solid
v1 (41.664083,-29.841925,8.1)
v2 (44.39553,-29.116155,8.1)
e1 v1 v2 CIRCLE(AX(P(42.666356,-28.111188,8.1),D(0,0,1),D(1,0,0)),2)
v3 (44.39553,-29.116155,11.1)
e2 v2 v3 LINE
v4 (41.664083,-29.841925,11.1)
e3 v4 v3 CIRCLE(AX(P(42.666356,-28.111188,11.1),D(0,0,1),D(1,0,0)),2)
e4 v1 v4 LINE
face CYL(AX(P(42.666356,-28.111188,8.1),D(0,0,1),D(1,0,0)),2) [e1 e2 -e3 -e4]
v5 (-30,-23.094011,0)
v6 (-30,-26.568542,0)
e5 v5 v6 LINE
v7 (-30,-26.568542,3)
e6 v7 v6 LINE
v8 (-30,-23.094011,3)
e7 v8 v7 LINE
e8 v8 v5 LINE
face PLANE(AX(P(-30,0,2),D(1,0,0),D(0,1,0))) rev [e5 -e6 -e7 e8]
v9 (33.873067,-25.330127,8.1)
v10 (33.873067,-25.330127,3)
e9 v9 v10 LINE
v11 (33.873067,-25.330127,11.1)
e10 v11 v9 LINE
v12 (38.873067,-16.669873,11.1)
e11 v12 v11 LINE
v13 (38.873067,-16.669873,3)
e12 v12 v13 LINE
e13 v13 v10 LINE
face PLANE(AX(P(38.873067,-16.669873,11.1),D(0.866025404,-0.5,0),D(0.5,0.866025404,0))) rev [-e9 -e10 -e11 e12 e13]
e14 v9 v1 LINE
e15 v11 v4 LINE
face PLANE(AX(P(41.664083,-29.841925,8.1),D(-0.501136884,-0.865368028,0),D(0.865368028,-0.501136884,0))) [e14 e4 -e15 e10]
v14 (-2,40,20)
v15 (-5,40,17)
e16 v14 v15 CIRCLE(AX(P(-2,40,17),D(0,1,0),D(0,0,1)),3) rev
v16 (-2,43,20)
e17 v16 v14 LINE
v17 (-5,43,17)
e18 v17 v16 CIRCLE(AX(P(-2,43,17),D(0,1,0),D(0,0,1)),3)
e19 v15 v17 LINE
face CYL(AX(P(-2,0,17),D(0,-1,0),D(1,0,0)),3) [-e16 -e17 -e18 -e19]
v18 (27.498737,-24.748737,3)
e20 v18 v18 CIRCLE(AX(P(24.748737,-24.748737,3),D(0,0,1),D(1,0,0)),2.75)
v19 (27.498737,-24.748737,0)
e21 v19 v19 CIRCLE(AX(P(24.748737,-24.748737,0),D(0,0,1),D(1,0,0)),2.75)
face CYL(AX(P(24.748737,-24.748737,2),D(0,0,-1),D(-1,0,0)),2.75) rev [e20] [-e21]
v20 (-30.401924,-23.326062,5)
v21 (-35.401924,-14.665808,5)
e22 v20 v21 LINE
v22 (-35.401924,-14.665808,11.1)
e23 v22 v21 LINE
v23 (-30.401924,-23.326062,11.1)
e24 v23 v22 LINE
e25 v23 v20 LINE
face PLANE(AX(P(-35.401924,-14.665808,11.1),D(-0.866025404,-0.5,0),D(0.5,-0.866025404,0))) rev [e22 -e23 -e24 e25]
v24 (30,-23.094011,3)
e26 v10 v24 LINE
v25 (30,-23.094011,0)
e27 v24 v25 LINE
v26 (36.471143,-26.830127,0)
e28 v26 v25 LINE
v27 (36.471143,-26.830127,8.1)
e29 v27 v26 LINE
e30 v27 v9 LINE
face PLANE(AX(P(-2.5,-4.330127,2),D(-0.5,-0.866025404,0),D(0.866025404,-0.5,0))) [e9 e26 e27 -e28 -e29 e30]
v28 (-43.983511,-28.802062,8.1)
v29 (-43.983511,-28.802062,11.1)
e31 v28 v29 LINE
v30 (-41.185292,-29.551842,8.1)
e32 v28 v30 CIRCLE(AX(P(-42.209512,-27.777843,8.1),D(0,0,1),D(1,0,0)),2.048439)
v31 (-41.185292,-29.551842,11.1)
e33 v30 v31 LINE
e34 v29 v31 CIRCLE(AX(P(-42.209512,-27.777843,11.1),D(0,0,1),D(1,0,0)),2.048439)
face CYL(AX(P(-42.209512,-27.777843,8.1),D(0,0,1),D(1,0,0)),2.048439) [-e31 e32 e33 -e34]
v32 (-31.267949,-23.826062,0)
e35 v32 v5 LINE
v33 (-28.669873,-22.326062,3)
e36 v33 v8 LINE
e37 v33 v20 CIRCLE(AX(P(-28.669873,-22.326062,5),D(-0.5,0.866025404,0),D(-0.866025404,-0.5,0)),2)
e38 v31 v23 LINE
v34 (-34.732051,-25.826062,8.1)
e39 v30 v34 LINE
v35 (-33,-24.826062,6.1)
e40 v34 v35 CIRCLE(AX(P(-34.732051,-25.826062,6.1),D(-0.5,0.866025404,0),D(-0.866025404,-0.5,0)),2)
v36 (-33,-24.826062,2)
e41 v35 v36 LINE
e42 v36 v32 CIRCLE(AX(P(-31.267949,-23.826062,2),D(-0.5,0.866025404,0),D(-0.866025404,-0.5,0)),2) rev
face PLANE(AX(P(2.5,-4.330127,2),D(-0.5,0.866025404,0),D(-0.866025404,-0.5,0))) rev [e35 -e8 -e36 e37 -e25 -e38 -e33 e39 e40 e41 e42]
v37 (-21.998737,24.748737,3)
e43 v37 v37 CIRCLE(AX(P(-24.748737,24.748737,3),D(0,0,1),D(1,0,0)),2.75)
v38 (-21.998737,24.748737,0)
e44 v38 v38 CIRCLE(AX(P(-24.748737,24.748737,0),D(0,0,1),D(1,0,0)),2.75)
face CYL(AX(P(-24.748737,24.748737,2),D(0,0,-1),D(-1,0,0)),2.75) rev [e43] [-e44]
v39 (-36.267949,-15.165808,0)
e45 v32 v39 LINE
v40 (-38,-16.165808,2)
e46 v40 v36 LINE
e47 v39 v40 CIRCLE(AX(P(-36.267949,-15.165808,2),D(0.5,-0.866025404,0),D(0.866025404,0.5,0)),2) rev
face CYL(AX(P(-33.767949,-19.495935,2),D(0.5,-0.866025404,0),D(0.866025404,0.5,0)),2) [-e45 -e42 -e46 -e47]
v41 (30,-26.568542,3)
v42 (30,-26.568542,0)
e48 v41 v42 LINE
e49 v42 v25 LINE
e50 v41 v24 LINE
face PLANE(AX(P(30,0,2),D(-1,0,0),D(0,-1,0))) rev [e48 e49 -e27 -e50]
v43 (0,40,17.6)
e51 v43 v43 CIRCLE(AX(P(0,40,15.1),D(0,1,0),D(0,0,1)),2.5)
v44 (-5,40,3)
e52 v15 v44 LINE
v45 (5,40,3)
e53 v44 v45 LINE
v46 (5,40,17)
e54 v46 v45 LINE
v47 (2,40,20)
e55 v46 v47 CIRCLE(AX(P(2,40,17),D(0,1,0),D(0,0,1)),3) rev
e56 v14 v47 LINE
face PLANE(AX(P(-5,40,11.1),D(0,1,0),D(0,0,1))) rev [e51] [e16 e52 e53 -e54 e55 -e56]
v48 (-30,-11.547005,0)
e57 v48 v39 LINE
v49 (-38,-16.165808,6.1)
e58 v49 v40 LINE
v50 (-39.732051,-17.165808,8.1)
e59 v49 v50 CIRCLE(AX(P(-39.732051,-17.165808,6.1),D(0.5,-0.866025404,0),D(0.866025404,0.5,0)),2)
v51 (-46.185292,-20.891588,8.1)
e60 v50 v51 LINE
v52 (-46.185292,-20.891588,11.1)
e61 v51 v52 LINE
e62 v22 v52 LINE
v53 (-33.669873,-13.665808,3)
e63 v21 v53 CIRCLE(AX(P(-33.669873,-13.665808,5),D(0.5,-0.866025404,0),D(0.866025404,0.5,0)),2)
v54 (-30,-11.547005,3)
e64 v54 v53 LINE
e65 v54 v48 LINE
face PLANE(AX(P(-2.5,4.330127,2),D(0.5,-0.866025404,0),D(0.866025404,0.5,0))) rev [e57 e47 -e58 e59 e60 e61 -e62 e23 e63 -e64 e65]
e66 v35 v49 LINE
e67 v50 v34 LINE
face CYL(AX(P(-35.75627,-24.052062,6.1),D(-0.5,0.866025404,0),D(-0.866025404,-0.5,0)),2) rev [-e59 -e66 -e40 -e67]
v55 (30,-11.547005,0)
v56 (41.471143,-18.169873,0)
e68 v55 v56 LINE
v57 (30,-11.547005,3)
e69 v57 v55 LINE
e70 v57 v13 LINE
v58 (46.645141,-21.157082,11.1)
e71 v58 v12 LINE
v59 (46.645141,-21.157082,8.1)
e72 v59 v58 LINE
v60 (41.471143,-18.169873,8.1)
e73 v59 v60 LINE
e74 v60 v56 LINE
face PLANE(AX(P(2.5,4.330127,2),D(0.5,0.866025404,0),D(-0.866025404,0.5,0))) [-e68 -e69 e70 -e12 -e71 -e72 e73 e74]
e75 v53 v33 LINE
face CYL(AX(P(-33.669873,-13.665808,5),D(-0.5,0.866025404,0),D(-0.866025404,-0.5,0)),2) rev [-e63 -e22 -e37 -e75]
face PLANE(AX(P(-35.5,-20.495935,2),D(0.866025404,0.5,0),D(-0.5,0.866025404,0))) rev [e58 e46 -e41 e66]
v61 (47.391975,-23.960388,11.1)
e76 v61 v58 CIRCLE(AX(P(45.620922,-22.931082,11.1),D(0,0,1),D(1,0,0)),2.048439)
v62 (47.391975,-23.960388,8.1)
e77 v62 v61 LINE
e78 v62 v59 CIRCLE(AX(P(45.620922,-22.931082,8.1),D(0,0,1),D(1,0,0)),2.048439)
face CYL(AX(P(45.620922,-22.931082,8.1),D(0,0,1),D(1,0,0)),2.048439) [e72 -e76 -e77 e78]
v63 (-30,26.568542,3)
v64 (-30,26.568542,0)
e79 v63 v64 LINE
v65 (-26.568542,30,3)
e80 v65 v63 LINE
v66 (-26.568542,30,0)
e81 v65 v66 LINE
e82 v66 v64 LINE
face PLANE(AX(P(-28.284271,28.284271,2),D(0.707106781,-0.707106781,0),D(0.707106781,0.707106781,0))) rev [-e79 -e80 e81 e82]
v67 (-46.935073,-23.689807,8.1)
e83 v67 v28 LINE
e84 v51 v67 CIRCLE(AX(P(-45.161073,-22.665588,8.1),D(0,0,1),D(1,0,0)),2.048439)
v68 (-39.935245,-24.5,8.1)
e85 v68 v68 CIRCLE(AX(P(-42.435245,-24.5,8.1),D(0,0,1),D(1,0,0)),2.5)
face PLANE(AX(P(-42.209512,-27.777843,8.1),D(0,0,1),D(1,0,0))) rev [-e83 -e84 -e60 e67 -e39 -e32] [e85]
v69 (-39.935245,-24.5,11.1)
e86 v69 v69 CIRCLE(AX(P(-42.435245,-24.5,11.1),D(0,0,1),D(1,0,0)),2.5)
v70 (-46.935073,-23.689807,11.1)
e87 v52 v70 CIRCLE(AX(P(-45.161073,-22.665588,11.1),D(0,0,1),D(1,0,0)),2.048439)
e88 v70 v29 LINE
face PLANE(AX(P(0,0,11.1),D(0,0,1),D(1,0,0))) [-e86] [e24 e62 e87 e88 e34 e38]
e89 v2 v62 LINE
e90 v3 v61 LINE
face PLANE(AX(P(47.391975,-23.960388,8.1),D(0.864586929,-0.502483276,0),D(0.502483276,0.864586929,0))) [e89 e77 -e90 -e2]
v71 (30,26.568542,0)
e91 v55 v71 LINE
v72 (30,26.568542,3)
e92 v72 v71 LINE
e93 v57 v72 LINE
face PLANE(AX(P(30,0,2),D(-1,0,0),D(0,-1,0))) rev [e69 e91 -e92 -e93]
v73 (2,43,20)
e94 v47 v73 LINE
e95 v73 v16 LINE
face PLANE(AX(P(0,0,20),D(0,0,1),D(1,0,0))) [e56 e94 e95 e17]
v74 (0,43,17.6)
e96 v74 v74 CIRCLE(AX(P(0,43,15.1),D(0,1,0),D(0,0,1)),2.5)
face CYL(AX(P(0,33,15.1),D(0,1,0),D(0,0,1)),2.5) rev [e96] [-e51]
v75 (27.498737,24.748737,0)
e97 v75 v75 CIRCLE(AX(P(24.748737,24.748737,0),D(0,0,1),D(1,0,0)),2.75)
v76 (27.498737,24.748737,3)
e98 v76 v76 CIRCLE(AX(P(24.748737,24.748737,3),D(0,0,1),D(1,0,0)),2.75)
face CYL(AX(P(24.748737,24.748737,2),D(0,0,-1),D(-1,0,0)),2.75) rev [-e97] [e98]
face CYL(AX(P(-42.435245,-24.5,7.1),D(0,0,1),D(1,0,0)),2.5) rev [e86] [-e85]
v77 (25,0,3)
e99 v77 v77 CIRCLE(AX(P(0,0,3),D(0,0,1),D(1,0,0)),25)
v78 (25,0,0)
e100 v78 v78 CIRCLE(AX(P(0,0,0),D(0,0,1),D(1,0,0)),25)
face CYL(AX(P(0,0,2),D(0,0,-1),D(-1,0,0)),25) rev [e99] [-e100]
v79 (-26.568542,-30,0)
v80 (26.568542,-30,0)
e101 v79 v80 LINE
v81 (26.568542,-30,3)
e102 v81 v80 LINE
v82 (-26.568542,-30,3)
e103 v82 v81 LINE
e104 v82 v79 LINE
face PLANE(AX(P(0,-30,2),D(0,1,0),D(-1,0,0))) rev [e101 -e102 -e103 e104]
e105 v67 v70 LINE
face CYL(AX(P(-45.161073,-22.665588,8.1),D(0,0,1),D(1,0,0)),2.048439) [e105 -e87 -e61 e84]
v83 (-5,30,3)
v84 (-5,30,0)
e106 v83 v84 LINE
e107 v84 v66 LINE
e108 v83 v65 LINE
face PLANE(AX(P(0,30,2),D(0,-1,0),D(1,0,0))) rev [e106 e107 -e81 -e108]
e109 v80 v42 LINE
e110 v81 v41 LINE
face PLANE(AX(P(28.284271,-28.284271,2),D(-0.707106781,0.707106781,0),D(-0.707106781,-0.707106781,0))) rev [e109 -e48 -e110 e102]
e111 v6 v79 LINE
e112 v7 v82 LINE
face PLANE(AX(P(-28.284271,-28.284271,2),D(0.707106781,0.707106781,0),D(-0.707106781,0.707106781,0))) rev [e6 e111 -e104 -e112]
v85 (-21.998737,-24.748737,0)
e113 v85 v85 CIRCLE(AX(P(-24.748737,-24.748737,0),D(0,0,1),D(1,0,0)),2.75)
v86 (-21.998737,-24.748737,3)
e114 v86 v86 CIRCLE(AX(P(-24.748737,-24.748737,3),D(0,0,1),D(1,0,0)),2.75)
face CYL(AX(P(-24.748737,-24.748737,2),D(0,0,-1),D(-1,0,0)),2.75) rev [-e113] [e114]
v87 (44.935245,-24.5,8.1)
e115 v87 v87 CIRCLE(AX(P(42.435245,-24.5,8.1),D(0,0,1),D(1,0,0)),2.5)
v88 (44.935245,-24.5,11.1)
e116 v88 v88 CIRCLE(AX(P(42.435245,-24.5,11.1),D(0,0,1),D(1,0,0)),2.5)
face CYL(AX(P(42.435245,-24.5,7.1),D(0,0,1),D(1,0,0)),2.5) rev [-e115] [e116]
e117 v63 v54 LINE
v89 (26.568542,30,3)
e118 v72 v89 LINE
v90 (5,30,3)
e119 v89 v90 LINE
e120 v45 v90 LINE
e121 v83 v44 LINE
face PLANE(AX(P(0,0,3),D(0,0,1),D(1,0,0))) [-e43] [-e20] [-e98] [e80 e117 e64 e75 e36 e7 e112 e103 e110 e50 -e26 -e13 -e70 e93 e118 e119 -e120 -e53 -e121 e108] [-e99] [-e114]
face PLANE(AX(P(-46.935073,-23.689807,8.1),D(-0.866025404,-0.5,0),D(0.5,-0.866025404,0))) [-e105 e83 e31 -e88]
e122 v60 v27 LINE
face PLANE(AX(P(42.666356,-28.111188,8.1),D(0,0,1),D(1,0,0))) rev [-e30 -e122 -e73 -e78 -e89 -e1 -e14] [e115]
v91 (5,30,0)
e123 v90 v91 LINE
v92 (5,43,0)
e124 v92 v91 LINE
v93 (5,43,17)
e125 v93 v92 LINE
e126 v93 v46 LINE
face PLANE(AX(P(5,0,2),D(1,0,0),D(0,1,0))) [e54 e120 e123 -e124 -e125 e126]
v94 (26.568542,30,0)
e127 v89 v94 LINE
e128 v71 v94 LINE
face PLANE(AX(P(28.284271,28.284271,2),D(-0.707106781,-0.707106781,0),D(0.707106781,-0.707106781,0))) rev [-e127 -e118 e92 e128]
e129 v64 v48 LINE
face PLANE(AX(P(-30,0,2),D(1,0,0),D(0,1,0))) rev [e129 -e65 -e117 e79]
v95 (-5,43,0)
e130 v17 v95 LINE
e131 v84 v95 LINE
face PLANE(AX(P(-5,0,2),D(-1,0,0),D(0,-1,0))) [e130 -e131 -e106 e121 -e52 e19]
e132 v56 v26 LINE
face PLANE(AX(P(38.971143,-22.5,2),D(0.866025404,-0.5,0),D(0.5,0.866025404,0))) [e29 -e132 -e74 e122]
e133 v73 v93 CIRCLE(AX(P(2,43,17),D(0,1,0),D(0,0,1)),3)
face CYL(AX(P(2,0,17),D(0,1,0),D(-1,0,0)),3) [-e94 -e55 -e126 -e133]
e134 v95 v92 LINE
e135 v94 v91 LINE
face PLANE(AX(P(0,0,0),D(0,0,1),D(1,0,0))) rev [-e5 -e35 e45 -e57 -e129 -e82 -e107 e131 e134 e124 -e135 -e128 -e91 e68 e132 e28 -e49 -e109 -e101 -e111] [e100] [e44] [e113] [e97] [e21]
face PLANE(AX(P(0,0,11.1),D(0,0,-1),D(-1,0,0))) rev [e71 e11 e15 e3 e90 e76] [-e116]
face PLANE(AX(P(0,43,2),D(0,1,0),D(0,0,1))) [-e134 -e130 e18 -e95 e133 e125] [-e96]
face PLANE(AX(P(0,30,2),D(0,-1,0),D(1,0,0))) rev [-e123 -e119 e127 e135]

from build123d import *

# Parameters (mm, degrees)
SKETCH1_R           = 2.75
SKETCH1_R_2         = 25
SKETCH1_W           = 10
SKETCH1_H           = 11
SKETCH1_H_2         = 2
BOSS_EXTRUDE1_DEPTH = 2
SKETCH5_W           = 10
SKETCH5_H           = 3
BOSS_EXTRUDE2_DEPTH = 9.1
BOSS_EXTRUDE5_DEPTH = 3
SKETCH5_2_W         = 10
SKETCH5_2_H         = 3
BOSS_EXTRUDE6_DEPTH = 18
SKETCH7_R           = 2.5
CUT_EXTRUDE1_DEPTH  = 10
SKETCH1_4_R         = 2.75
SKETCH1_4_R_2       = 25
BOSS_EXTRUDE7_DEPTH = 3
SKETCH1_5_W         = 10
SKETCH1_5_H         = 11
BOSS_EXTRUDE8_DEPTH = 3
FILLET5_R           = 2
SKETCH10_R          = 2.5
CUT_EXTRUDE2_DEPTH  = 4
FILLET6_R           = 3
FILLET7_START       = -5
FILLET7_DEPTH       = 10
FILLET7_2_DEPTH     = 10


with BuildPart() as part:
    # Sketch1 → Boss-Extrude1 (new body)
    # profile 1 of 7: a face of its own
    with BuildSketch(Plane.XY):
        Polygon((26.568542495, 30), (-26.568542495, 30), (-30, 26.568542495), (-30, -26.568542495), (-26.568542495, -30), (26.568542495, -30), (30, -26.568542495), (30, 26.568542495), align=None)
        with Locations((-24.748737342, -24.748737342)):
            Circle(SKETCH1_R, mode=Mode.SUBTRACT)
        with Locations((24.748737342, -24.748737342)):
            Circle(SKETCH1_R, mode=Mode.SUBTRACT)
        with Locations((24.748737342, 24.748737342)):
            Circle(SKETCH1_R, mode=Mode.SUBTRACT)
        with Locations((-24.748737342, 24.748737342)):
            Circle(SKETCH1_R, mode=Mode.SUBTRACT)
        Circle(SKETCH1_R_2, mode=Mode.SUBTRACT)
    # profile 2 of 7: a face of its own
    with BuildSketch(Plane.XY):
        Polygon((-30, -23.094010768), (-30, -11.547005384), (-36.267949192, -15.165807537), (-31.267949192, -23.826061575), align=None)
    # profile 3 of 7: a face of its own
    with BuildSketch(Plane.XY):
        with Locations((0, 35.5)):
            Rectangle(SKETCH1_W, SKETCH1_H)
    # profile 4 of 7: a face of its own
    with BuildSketch(Plane.XY):
        Polygon((39.739092363, -17.169872981), (30, -11.547005384), (30, -23.094010768), (34.739092363, -25.830127019), align=None)
    # profile 5 of 7: a face of its own
    with BuildSketch(Plane.XY):
        Polygon((41.47114317, -18.169872981), (39.739092363, -17.169872981), (34.739092363, -25.830127019), (36.47114317, -26.830127019), align=None)
    # profile 6 of 7: a face of its own
    with BuildSketch(Plane.XY):
        with Locations((0, 42)):
            Rectangle(SKETCH1_W, SKETCH1_H_2)
    # profile 7 of 7: a face of its own
    with BuildSketch(Plane.XY):
        Polygon((-31.267949192, -23.826061575), (-36.267949192, -15.165807537), (-38, -16.165807537), (-33, -24.826061575), align=None)
    extrude(amount=BOSS_EXTRUDE1_DEPTH)

    # Sketch5 → Boss-Extrude2 (add)
    with BuildSketch(Plane.XY.offset(2)):
        with Locations((0, 41.5)):
            Rectangle(SKETCH5_W, SKETCH5_H)
        Polygon((-38, -16.165807537), (-35.401923789, -14.665807537), (-30.401923789, -23.326061575), (-33, -24.826061575), align=None)
        Polygon((41.47114317, -18.169872981), (38.873066959, -16.669872981), (33.873066959, -25.330127019), (36.47114317, -26.830127019), align=None)
    extrude(amount=BOSS_EXTRUDE2_DEPTH)

    # Sketch6 → Boss-Extrude5 (add)
    with BuildSketch(Plane.XY.offset(11.1)):
        with BuildLine():
            Line((-46.185292351, -20.891588279), (-35.401923789, -14.665807537))
            Line((-35.401923789, -14.665807537), (-30.401923789, -23.326061575))
            Line((-30.401923789, -23.326061575), (-41.185292351, -29.551842317))
            ThreePointArc((-41.185292351, -29.551842317), (-42.739686509, -29.75648219), (-43.983511401, -28.802061782))
            Line((-43.983511401, -28.802061782), (-46.935072886, -23.68980733))
            ThreePointArc((-46.935072886, -23.68980733), (-47.139712759, -22.135413172), (-46.185292351, -20.891588279))
        make_face()
        with BuildLine():
            Line((38.897920412, -16.684222129), (33.873066959, -25.330127019))
            Line((33.873066959, -25.330127019), (41.664082648, -29.84192454))
            ThreePointArc((41.664082648, -29.84192454), (43.179952831, -30.044118571), (44.395530273, -29.116155036))
            Line((44.395530273, -29.116155036), (47.391974814, -23.960387856))
            ThreePointArc((47.391974814, -23.960387856), (47.600320032, -22.403746576), (46.645140907, -21.157081967))
            Line((46.645140907, -21.157081967), (38.897920412, -16.684222129))
        make_face()
    extrude(amount=-BOSS_EXTRUDE5_DEPTH)

    # Sketch5<2> → Boss-Extrude6 (add)
    with BuildSketch(Plane.XY.offset(2)):
        with Locations((0, 41.5)):
            Rectangle(SKETCH5_2_W, SKETCH5_2_H)
    extrude(amount=BOSS_EXTRUDE6_DEPTH)

    # Sketch7 → Cut-Extrude1 (cut)
    with BuildSketch(Plane(origin=(0, 43, 0), x_dir=(1, 0, 0), z_dir=(0, 1, 0))):
        with Locations(Location((0, -15.1, 0), (0, 0, 270))):
            Circle(SKETCH7_R)
    extrude(amount=-CUT_EXTRUDE1_DEPTH, mode=Mode.SUBTRACT)

    # Sketch1<4> → Boss-Extrude7 (add)
    with BuildSketch(Plane.XY):
        Polygon((26.568542495, 30), (-26.568542495, 30), (-30, 26.568542495), (-30, -26.568542495), (-26.568542495, -30), (26.568542495, -30), (30, -26.568542495), (30, 26.568542495), align=None)
        with Locations((-24.748737342, -24.748737342)):
            Circle(SKETCH1_4_R, mode=Mode.SUBTRACT)
        with Locations((24.748737342, -24.748737342)):
            Circle(SKETCH1_4_R, mode=Mode.SUBTRACT)
        with Locations((24.748737342, 24.748737342)):
            Circle(SKETCH1_4_R, mode=Mode.SUBTRACT)
        with Locations((-24.748737342, 24.748737342)):
            Circle(SKETCH1_4_R, mode=Mode.SUBTRACT)
        Circle(SKETCH1_4_R_2, mode=Mode.SUBTRACT)
    extrude(amount=BOSS_EXTRUDE7_DEPTH)

    # Sketch1<5> → Boss-Extrude8 (add)
    with BuildSketch(Plane.XY):
        with Locations((0, 35.5)):
            Rectangle(SKETCH1_5_W, SKETCH1_5_H)
        Polygon((-30, -23.094010768), (-30, -11.547005384), (-36.267949192, -15.165807537), (-31.267949192, -23.826061575), align=None)
        Polygon((39.739092363, -17.169872981), (30, -11.547005384), (30, -23.094010768), (34.739092363, -25.830127019), align=None)
    extrude(amount=BOSS_EXTRUDE8_DEPTH)

    # Fillet5
    fillet5_edges = [part.edges().sort_by_distance(p)[0] for p in [
        (-35.5, -20.495934556, 8.1),
    ]]
    fillet(fillet5_edges, radius=FILLET5_R)

    # Sketch10 → Cut-Extrude2 (cut)
    with BuildSketch(Plane.XY.offset(11.1)):
        with Locations((42.435244785, -24.5)):
            Circle(SKETCH10_R)
        with Locations((-42.435244785, -24.5)):
            Circle(SKETCH10_R)
    extrude(amount=-CUT_EXTRUDE2_DEPTH, mode=Mode.SUBTRACT)

    # Fillet6
    fillet6_edges = [part.edges().sort_by_distance(p)[0] for p in [
        (-5, 41.5, 20),
        (5, 41.5, 20),
    ]]
    fillet(fillet6_edges, radius=FILLET6_R)

    # Fillet7: read off the stored shape, not the designer's step
    # Fillet7 outline → Fillet7 (cut)
    with BuildSketch(Plane(origin=(0, 0, 0), x_dir=(0.8660254037844398, 0.499999999999998, 0), z_dir=(0.49999999999999795, -0.8660254037844399, 0)).offset(FILLET7_START)):
        with BuildLine():
            ThreePointArc((-38.991869112, 0), (-40.406082675, 0.585786438), (-40.991869112, 2))
            Line((-40.991869112, 2), (-40.991869112, 0))
            Line((-40.991869112, 0), (-38.991869112, 0))
        make_face()
    extrude(amount=FILLET7_DEPTH, mode=Mode.SUBTRACT)

    # Fillet7 2 outline → Fillet7 2 (add)
    with BuildSketch(Plane(origin=(0, 0, 0), x_dir=(0.8660254037844398, 0.499999999999998, 0), z_dir=(0.49999999999999795, -0.8660254037844399, 0)).offset(FILLET7_START)):
        with BuildLine():
            Line((-37.991869112, 3), (-35.991869112, 3))
            ThreePointArc((-35.991869112, 3), (-37.406082675, 3.585786438), (-37.991869112, 5))
            Line((-37.991869112, 5), (-37.991869112, 3))
        make_face()
    extrude(amount=FILLET7_2_DEPTH)


solid = part.part
